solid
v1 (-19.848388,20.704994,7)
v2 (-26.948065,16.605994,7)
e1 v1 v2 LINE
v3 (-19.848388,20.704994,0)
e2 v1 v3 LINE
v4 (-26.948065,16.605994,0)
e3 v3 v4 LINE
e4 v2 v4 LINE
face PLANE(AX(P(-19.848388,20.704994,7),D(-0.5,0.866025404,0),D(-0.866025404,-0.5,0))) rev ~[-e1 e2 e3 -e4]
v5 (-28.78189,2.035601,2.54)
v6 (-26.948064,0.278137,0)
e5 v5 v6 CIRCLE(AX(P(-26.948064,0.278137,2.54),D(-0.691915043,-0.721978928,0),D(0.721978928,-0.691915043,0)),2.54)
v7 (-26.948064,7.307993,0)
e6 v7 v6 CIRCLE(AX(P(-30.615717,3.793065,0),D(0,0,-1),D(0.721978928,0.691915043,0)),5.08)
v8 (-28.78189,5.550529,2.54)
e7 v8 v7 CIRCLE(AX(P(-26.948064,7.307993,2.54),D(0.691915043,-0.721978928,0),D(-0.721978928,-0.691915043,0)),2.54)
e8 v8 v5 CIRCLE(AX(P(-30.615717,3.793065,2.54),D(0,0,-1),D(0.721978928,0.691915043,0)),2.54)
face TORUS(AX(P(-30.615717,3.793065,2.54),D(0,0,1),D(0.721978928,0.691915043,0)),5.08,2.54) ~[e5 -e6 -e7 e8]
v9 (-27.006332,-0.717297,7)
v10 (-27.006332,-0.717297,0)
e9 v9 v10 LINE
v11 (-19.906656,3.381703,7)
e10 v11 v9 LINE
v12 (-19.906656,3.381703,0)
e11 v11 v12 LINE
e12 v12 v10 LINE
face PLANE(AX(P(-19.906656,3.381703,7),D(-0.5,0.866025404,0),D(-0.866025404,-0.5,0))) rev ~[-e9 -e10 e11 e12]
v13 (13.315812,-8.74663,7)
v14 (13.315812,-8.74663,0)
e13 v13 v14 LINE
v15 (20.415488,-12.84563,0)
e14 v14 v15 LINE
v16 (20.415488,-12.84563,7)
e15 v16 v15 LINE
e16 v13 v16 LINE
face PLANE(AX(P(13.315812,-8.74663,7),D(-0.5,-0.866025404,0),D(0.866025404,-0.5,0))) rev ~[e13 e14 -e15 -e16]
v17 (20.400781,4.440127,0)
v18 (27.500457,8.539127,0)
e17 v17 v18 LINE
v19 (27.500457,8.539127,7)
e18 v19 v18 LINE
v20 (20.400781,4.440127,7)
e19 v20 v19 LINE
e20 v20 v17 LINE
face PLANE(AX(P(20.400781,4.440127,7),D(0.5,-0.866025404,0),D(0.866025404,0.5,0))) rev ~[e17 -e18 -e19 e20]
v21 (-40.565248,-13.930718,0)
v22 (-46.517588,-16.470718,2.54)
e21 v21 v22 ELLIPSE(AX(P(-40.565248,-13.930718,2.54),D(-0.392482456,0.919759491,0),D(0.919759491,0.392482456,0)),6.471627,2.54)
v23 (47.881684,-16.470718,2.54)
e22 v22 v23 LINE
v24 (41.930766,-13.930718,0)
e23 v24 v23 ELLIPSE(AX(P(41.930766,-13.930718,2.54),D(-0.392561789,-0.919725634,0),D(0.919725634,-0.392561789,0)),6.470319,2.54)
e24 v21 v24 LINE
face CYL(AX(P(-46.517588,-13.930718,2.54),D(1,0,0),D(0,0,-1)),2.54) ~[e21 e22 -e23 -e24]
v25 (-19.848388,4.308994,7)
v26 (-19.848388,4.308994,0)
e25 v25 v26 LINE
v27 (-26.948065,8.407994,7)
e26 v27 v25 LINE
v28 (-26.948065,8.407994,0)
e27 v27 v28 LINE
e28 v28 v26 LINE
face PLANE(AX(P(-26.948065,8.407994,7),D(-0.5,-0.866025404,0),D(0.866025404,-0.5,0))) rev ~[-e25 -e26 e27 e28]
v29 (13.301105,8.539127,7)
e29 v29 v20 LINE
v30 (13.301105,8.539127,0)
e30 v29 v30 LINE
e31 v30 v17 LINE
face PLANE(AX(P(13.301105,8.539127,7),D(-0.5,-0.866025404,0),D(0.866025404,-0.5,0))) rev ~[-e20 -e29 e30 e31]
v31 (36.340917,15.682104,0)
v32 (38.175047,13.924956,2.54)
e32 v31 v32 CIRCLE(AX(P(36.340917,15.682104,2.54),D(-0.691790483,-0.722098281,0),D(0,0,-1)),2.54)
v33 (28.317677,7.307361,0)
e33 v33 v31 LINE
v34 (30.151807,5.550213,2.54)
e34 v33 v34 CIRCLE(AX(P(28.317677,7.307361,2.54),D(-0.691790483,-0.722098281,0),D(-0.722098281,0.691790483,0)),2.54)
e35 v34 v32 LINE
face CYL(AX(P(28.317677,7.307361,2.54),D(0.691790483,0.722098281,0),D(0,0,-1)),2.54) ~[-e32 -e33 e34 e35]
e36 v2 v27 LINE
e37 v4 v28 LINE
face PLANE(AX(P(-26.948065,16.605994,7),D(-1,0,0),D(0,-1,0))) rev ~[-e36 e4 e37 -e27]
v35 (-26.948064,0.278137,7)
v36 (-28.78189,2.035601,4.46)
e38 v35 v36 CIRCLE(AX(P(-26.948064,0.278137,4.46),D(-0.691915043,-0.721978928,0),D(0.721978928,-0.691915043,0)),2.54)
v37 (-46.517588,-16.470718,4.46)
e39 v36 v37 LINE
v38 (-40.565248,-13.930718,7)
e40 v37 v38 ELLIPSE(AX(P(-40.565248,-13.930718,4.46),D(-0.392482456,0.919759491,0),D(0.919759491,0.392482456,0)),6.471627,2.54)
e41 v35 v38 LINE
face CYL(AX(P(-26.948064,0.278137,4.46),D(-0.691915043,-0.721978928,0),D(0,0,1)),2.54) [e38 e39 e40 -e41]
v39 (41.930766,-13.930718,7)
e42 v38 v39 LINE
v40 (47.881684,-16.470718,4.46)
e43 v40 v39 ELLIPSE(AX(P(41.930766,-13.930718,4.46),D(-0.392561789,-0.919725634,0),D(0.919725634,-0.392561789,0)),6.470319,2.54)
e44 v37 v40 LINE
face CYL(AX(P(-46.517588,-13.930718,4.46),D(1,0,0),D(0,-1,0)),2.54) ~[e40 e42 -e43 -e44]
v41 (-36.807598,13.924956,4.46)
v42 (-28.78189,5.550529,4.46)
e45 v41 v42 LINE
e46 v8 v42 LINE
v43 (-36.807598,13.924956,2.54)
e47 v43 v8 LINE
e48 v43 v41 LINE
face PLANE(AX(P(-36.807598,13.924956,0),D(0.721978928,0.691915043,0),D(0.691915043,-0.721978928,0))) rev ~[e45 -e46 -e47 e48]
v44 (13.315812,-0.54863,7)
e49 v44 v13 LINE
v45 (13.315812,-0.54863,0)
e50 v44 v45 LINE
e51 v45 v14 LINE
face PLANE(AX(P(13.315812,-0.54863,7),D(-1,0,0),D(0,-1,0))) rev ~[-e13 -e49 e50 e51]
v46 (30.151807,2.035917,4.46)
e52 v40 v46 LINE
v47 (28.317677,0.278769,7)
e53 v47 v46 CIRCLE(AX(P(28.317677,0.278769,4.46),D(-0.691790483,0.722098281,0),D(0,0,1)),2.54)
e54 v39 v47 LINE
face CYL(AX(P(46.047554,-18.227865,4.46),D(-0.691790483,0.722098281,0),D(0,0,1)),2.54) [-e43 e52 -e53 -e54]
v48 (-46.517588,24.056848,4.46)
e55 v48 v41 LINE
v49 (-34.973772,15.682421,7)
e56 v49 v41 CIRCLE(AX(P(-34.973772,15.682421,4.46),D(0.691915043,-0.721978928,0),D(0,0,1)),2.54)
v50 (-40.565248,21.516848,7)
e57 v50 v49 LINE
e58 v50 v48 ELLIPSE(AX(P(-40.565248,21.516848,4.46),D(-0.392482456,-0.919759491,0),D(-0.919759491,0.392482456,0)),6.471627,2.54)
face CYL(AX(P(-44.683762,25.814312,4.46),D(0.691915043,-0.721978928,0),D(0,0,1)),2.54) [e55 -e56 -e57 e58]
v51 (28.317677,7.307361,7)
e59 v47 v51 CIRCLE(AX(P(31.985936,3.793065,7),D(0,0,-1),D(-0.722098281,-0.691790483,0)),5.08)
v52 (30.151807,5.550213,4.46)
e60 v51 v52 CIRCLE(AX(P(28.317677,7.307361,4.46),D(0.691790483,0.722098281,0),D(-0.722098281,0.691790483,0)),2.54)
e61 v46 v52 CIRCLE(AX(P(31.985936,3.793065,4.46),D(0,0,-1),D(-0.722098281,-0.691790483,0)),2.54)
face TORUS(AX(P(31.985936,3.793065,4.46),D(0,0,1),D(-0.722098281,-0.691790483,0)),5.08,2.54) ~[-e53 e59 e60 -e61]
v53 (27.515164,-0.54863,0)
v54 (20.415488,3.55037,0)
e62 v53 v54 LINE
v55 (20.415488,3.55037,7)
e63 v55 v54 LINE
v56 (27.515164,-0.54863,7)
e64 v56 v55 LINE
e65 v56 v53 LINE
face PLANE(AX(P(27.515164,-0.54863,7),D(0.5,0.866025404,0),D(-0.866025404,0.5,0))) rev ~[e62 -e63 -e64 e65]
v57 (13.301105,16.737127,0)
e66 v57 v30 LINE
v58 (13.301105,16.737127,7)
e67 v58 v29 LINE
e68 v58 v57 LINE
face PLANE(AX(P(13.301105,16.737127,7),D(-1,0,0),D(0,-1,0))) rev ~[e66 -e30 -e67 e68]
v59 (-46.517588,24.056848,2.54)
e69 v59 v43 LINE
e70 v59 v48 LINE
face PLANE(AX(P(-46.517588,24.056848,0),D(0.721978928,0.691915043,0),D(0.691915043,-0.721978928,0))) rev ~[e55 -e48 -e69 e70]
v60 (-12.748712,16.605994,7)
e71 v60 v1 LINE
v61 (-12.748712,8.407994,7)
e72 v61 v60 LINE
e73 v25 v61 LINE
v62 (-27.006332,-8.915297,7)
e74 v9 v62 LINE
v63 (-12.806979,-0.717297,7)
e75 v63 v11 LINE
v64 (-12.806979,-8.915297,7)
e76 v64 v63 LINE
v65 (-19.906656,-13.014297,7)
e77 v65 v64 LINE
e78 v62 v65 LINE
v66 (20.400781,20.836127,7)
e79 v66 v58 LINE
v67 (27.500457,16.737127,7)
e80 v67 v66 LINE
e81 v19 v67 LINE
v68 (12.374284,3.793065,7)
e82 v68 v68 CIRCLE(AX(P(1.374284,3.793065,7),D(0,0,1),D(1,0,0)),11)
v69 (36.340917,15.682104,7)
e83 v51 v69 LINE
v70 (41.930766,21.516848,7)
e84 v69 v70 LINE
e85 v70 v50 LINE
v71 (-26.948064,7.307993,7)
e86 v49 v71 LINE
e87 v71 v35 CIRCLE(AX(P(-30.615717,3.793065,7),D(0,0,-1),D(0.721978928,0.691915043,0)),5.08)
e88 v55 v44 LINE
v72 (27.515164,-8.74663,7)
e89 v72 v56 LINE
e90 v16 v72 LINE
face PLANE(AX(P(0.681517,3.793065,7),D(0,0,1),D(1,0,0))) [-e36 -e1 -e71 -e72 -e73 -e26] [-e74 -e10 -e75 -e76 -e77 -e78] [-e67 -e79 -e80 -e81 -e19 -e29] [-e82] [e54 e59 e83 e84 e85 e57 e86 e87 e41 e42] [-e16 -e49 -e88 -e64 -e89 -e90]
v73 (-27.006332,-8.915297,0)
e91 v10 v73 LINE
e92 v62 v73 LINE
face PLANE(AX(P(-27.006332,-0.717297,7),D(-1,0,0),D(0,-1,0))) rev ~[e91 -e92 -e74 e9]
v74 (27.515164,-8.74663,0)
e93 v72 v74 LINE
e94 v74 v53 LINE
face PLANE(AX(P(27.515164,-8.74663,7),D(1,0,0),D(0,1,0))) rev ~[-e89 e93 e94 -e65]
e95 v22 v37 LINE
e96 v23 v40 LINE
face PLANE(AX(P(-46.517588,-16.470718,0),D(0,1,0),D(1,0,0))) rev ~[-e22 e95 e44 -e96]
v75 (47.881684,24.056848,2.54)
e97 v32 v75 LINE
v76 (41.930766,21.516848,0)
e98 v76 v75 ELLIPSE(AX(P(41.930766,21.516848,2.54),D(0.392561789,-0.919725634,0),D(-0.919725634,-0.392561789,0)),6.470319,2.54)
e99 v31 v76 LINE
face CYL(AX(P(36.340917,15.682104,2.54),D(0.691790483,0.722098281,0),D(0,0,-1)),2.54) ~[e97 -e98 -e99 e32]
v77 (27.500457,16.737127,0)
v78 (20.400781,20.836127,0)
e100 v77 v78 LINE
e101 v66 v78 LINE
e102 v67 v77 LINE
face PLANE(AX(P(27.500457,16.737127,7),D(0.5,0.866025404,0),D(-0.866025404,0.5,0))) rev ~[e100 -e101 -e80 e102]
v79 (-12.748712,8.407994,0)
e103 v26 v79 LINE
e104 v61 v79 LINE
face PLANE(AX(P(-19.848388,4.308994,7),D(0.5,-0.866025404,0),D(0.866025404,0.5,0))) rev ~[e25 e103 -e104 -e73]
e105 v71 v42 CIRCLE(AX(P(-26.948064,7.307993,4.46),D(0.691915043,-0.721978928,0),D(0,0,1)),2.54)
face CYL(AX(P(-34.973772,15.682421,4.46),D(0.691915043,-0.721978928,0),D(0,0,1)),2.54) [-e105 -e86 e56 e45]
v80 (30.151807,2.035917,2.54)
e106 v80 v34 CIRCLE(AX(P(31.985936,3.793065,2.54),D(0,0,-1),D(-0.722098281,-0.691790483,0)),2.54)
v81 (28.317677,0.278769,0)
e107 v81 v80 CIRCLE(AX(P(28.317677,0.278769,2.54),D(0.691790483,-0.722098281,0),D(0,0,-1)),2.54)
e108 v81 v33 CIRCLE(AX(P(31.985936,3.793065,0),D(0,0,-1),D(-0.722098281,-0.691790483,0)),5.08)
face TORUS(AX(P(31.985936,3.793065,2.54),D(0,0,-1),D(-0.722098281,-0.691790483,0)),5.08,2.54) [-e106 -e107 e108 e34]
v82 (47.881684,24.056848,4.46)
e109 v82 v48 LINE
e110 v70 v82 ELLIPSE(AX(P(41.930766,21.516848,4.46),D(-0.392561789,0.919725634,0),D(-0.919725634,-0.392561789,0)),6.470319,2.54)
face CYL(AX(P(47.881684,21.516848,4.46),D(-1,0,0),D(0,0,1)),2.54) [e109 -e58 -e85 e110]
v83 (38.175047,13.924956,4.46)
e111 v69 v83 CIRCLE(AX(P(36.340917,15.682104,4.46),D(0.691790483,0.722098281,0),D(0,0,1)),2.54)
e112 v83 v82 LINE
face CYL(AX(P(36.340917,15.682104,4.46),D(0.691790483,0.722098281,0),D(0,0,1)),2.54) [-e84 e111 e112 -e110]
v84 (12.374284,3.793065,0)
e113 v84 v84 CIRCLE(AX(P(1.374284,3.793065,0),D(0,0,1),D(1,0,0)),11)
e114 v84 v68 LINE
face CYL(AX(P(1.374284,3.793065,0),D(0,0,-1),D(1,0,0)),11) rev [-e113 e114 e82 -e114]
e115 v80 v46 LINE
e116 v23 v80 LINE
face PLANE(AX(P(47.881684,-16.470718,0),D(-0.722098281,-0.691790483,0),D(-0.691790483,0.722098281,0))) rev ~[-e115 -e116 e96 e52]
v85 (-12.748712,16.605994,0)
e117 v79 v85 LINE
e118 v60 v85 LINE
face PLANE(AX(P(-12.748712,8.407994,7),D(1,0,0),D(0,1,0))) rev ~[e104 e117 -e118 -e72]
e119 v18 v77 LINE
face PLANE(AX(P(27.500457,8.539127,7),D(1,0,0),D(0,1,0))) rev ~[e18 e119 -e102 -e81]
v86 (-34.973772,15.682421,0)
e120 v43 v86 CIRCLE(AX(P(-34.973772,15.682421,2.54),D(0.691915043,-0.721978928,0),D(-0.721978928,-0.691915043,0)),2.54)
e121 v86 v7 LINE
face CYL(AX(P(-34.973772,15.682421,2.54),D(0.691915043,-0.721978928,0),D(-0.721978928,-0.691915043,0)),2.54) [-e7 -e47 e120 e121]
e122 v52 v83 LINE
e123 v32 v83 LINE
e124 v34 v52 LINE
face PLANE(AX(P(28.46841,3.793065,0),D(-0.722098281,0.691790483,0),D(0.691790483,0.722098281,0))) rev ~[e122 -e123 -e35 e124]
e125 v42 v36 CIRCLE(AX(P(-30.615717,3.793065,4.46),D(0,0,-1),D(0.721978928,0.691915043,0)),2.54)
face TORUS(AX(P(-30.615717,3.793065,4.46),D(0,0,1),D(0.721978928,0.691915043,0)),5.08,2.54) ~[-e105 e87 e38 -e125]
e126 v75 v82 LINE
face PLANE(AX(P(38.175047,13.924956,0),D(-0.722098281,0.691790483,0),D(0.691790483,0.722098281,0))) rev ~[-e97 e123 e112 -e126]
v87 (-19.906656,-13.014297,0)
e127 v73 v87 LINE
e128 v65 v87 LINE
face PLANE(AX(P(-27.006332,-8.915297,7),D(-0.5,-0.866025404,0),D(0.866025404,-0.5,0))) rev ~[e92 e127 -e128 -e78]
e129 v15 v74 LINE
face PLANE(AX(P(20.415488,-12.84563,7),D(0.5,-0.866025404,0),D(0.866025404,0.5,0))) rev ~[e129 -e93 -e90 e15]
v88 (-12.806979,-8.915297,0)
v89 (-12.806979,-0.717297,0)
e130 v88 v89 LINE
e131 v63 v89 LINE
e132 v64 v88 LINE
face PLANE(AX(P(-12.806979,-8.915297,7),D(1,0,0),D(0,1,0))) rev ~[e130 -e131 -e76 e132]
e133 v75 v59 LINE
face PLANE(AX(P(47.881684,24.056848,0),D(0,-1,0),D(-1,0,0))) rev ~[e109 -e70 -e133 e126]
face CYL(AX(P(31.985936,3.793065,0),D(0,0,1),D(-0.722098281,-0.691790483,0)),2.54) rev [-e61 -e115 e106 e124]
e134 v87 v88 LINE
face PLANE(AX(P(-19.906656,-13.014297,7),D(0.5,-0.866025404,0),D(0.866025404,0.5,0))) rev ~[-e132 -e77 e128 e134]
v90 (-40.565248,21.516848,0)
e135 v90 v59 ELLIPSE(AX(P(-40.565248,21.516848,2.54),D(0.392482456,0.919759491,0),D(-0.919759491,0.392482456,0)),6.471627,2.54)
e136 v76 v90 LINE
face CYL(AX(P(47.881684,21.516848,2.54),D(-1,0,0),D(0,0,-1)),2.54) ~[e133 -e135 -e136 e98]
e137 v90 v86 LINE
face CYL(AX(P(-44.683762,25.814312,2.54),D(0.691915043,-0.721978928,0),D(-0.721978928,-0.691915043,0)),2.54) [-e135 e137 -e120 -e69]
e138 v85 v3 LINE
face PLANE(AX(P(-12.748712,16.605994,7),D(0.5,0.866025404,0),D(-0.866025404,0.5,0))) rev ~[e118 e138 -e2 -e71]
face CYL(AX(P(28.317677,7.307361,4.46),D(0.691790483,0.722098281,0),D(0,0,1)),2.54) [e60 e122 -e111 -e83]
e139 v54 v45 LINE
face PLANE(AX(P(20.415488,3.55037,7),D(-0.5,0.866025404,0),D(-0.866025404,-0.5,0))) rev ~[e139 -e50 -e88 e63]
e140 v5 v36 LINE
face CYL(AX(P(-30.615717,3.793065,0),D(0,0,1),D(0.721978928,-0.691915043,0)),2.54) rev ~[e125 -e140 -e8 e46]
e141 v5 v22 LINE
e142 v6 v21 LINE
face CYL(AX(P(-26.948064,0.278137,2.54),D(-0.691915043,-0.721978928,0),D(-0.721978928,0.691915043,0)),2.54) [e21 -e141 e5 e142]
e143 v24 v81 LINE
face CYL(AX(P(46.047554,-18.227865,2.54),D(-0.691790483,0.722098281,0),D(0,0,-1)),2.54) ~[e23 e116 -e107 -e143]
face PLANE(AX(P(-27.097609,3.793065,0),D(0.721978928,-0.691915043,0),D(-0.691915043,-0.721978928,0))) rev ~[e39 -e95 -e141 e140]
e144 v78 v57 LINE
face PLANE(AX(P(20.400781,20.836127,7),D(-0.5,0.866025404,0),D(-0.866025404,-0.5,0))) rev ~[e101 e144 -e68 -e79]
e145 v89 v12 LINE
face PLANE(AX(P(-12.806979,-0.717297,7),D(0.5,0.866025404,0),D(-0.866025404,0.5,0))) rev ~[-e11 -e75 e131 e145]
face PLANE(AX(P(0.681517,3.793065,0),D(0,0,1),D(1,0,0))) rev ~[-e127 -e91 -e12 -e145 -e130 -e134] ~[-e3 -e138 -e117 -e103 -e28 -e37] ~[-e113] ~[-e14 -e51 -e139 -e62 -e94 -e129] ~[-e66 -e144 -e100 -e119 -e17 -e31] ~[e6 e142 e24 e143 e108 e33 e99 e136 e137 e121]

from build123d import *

# Parameters (mm, degrees)
F0_R      = 11
F1_DEPTH  = 7
F2_F1_R   = 2.54
F2_F2_R   = 2.54
F7_DEPTH  = 7.001
F8_DEPTH  = 7.001
F9_DEPTH  = 7.001
F10_DEPTH = 7.001


with BuildPart() as f1:
    # F0 (on Top) → F1 (new body)
    with BuildSketch(Plane.XY):
        Polygon((-46.5175881982, -16.4707175266), (1.3742837651, -16.4707175266), (47.8816837651, -16.4707175266), (38.1750466591, -6.3388262363), (28.4684095532, 3.7930650539), (38.1750466591, 13.9249563442), (47.8816837651, 24.0568476345), (1.3742837651, 24.0568476345), (-46.5175881982, 24.0568476345), (-36.8075984385, 13.9249563442), (-27.0976086789, 3.7930650539), (-36.8075984385, -6.3388262363), align=None)
        with Locations((1.3742837651, 3.7930650539)):
            Circle(F0_R, mode=Mode.SUBTRACT)
    extrude(amount=F1_DEPTH)

    # F2: fillet of radius 2.54 on 10 edges, made by hand

    # F2_f1
    f2_f1_edges = [f1.edges().sort_by_distance(p)[0] for p in [
        (28.4684095532, 3.7930650539, 3.5),
        (-27.0976086789, 3.7930650539, 3.5),
    ]]
    fillet(f2_f1_edges, radius=F2_F1_R)

    # F2_f2
    f2_f2_edges = [f1.edges().sort_by_distance(p)[0] for p in [
        (0.6820477835, -16.4707175266, 7),
        (0.6820477835, 24.0568476345, 7),
        (0.6820477835, 24.0568476345, 0),
        (0.6820477835, -16.4707175266, 0),
        (39.0167452033, -7.2174001498, 7),
        (-37.649739308, 14.8036884491, 7),
        (-37.649739308, -7.2175583413, 0),
        (39.0167452033, 14.8035302576, 0),
        (29.4459362755, 3.7930650539, 0),
        (-28.0757168957, 3.7930650539, 0),
        (-28.0757168957, 3.7930650539, 7),
        (29.4459362755, 3.7930650539, 7),
    ]]
    fillet(f2_f2_edges, radius=F2_F2_R)

    # F3 (on face) → F7 (cut, through all)
    with BuildSketch(Plane.XY.offset(7)):
        Polygon((-12.7487120452, 8.4079941735), (-12.7487120452, 16.6059941735), (-19.8483883054, 20.7049941735), (-26.9480645657, 16.6059941735), (-26.9480645657, 8.4079941735), (-19.8483883054, 4.3089941735), align=None)
    extrude(amount=-F7_DEPTH, mode=Mode.SUBTRACT)

    # F4 (on face) → F8 (cut, through all)
    with BuildSketch(Plane.XY.offset(7)):
        Polygon((-12.8069793108, -8.9152967557), (-12.8069793108, -0.7172967557), (-19.906655571, 3.3817032443), (-27.0063318312, -0.7172967557), (-27.0063318312, -8.9152967557), (-19.906655571, -13.0142967557), align=None)
    extrude(amount=-F8_DEPTH, mode=Mode.SUBTRACT)

    # F6 (on face) → F9 (cut, through all)
    with BuildSketch(Plane.XY.offset(7)):
        Polygon((27.5151642737, -8.7466302544), (27.5151642737, -0.5486302544), (20.4154880135, 3.5503697456), (13.3158117533, -0.5486302544), (13.3158117533, -8.7466302544), (20.4154880135, -12.8456302544), align=None)
    extrude(amount=-F9_DEPTH, mode=Mode.SUBTRACT)

    # F5 (on face) → F10 (cut, through all)
    with BuildSketch(Plane.XY.offset(7)):
        Polygon((27.5004574447, 8.5391272614), (27.5004574447, 16.7371272614), (20.4007811844, 20.8361272614), (13.3011049242, 16.7371272614), (13.3011049242, 8.5391272614), (20.4007811844, 4.4401272614), align=None)
    extrude(amount=-F10_DEPTH, mode=Mode.SUBTRACT)


solid = f1.part
